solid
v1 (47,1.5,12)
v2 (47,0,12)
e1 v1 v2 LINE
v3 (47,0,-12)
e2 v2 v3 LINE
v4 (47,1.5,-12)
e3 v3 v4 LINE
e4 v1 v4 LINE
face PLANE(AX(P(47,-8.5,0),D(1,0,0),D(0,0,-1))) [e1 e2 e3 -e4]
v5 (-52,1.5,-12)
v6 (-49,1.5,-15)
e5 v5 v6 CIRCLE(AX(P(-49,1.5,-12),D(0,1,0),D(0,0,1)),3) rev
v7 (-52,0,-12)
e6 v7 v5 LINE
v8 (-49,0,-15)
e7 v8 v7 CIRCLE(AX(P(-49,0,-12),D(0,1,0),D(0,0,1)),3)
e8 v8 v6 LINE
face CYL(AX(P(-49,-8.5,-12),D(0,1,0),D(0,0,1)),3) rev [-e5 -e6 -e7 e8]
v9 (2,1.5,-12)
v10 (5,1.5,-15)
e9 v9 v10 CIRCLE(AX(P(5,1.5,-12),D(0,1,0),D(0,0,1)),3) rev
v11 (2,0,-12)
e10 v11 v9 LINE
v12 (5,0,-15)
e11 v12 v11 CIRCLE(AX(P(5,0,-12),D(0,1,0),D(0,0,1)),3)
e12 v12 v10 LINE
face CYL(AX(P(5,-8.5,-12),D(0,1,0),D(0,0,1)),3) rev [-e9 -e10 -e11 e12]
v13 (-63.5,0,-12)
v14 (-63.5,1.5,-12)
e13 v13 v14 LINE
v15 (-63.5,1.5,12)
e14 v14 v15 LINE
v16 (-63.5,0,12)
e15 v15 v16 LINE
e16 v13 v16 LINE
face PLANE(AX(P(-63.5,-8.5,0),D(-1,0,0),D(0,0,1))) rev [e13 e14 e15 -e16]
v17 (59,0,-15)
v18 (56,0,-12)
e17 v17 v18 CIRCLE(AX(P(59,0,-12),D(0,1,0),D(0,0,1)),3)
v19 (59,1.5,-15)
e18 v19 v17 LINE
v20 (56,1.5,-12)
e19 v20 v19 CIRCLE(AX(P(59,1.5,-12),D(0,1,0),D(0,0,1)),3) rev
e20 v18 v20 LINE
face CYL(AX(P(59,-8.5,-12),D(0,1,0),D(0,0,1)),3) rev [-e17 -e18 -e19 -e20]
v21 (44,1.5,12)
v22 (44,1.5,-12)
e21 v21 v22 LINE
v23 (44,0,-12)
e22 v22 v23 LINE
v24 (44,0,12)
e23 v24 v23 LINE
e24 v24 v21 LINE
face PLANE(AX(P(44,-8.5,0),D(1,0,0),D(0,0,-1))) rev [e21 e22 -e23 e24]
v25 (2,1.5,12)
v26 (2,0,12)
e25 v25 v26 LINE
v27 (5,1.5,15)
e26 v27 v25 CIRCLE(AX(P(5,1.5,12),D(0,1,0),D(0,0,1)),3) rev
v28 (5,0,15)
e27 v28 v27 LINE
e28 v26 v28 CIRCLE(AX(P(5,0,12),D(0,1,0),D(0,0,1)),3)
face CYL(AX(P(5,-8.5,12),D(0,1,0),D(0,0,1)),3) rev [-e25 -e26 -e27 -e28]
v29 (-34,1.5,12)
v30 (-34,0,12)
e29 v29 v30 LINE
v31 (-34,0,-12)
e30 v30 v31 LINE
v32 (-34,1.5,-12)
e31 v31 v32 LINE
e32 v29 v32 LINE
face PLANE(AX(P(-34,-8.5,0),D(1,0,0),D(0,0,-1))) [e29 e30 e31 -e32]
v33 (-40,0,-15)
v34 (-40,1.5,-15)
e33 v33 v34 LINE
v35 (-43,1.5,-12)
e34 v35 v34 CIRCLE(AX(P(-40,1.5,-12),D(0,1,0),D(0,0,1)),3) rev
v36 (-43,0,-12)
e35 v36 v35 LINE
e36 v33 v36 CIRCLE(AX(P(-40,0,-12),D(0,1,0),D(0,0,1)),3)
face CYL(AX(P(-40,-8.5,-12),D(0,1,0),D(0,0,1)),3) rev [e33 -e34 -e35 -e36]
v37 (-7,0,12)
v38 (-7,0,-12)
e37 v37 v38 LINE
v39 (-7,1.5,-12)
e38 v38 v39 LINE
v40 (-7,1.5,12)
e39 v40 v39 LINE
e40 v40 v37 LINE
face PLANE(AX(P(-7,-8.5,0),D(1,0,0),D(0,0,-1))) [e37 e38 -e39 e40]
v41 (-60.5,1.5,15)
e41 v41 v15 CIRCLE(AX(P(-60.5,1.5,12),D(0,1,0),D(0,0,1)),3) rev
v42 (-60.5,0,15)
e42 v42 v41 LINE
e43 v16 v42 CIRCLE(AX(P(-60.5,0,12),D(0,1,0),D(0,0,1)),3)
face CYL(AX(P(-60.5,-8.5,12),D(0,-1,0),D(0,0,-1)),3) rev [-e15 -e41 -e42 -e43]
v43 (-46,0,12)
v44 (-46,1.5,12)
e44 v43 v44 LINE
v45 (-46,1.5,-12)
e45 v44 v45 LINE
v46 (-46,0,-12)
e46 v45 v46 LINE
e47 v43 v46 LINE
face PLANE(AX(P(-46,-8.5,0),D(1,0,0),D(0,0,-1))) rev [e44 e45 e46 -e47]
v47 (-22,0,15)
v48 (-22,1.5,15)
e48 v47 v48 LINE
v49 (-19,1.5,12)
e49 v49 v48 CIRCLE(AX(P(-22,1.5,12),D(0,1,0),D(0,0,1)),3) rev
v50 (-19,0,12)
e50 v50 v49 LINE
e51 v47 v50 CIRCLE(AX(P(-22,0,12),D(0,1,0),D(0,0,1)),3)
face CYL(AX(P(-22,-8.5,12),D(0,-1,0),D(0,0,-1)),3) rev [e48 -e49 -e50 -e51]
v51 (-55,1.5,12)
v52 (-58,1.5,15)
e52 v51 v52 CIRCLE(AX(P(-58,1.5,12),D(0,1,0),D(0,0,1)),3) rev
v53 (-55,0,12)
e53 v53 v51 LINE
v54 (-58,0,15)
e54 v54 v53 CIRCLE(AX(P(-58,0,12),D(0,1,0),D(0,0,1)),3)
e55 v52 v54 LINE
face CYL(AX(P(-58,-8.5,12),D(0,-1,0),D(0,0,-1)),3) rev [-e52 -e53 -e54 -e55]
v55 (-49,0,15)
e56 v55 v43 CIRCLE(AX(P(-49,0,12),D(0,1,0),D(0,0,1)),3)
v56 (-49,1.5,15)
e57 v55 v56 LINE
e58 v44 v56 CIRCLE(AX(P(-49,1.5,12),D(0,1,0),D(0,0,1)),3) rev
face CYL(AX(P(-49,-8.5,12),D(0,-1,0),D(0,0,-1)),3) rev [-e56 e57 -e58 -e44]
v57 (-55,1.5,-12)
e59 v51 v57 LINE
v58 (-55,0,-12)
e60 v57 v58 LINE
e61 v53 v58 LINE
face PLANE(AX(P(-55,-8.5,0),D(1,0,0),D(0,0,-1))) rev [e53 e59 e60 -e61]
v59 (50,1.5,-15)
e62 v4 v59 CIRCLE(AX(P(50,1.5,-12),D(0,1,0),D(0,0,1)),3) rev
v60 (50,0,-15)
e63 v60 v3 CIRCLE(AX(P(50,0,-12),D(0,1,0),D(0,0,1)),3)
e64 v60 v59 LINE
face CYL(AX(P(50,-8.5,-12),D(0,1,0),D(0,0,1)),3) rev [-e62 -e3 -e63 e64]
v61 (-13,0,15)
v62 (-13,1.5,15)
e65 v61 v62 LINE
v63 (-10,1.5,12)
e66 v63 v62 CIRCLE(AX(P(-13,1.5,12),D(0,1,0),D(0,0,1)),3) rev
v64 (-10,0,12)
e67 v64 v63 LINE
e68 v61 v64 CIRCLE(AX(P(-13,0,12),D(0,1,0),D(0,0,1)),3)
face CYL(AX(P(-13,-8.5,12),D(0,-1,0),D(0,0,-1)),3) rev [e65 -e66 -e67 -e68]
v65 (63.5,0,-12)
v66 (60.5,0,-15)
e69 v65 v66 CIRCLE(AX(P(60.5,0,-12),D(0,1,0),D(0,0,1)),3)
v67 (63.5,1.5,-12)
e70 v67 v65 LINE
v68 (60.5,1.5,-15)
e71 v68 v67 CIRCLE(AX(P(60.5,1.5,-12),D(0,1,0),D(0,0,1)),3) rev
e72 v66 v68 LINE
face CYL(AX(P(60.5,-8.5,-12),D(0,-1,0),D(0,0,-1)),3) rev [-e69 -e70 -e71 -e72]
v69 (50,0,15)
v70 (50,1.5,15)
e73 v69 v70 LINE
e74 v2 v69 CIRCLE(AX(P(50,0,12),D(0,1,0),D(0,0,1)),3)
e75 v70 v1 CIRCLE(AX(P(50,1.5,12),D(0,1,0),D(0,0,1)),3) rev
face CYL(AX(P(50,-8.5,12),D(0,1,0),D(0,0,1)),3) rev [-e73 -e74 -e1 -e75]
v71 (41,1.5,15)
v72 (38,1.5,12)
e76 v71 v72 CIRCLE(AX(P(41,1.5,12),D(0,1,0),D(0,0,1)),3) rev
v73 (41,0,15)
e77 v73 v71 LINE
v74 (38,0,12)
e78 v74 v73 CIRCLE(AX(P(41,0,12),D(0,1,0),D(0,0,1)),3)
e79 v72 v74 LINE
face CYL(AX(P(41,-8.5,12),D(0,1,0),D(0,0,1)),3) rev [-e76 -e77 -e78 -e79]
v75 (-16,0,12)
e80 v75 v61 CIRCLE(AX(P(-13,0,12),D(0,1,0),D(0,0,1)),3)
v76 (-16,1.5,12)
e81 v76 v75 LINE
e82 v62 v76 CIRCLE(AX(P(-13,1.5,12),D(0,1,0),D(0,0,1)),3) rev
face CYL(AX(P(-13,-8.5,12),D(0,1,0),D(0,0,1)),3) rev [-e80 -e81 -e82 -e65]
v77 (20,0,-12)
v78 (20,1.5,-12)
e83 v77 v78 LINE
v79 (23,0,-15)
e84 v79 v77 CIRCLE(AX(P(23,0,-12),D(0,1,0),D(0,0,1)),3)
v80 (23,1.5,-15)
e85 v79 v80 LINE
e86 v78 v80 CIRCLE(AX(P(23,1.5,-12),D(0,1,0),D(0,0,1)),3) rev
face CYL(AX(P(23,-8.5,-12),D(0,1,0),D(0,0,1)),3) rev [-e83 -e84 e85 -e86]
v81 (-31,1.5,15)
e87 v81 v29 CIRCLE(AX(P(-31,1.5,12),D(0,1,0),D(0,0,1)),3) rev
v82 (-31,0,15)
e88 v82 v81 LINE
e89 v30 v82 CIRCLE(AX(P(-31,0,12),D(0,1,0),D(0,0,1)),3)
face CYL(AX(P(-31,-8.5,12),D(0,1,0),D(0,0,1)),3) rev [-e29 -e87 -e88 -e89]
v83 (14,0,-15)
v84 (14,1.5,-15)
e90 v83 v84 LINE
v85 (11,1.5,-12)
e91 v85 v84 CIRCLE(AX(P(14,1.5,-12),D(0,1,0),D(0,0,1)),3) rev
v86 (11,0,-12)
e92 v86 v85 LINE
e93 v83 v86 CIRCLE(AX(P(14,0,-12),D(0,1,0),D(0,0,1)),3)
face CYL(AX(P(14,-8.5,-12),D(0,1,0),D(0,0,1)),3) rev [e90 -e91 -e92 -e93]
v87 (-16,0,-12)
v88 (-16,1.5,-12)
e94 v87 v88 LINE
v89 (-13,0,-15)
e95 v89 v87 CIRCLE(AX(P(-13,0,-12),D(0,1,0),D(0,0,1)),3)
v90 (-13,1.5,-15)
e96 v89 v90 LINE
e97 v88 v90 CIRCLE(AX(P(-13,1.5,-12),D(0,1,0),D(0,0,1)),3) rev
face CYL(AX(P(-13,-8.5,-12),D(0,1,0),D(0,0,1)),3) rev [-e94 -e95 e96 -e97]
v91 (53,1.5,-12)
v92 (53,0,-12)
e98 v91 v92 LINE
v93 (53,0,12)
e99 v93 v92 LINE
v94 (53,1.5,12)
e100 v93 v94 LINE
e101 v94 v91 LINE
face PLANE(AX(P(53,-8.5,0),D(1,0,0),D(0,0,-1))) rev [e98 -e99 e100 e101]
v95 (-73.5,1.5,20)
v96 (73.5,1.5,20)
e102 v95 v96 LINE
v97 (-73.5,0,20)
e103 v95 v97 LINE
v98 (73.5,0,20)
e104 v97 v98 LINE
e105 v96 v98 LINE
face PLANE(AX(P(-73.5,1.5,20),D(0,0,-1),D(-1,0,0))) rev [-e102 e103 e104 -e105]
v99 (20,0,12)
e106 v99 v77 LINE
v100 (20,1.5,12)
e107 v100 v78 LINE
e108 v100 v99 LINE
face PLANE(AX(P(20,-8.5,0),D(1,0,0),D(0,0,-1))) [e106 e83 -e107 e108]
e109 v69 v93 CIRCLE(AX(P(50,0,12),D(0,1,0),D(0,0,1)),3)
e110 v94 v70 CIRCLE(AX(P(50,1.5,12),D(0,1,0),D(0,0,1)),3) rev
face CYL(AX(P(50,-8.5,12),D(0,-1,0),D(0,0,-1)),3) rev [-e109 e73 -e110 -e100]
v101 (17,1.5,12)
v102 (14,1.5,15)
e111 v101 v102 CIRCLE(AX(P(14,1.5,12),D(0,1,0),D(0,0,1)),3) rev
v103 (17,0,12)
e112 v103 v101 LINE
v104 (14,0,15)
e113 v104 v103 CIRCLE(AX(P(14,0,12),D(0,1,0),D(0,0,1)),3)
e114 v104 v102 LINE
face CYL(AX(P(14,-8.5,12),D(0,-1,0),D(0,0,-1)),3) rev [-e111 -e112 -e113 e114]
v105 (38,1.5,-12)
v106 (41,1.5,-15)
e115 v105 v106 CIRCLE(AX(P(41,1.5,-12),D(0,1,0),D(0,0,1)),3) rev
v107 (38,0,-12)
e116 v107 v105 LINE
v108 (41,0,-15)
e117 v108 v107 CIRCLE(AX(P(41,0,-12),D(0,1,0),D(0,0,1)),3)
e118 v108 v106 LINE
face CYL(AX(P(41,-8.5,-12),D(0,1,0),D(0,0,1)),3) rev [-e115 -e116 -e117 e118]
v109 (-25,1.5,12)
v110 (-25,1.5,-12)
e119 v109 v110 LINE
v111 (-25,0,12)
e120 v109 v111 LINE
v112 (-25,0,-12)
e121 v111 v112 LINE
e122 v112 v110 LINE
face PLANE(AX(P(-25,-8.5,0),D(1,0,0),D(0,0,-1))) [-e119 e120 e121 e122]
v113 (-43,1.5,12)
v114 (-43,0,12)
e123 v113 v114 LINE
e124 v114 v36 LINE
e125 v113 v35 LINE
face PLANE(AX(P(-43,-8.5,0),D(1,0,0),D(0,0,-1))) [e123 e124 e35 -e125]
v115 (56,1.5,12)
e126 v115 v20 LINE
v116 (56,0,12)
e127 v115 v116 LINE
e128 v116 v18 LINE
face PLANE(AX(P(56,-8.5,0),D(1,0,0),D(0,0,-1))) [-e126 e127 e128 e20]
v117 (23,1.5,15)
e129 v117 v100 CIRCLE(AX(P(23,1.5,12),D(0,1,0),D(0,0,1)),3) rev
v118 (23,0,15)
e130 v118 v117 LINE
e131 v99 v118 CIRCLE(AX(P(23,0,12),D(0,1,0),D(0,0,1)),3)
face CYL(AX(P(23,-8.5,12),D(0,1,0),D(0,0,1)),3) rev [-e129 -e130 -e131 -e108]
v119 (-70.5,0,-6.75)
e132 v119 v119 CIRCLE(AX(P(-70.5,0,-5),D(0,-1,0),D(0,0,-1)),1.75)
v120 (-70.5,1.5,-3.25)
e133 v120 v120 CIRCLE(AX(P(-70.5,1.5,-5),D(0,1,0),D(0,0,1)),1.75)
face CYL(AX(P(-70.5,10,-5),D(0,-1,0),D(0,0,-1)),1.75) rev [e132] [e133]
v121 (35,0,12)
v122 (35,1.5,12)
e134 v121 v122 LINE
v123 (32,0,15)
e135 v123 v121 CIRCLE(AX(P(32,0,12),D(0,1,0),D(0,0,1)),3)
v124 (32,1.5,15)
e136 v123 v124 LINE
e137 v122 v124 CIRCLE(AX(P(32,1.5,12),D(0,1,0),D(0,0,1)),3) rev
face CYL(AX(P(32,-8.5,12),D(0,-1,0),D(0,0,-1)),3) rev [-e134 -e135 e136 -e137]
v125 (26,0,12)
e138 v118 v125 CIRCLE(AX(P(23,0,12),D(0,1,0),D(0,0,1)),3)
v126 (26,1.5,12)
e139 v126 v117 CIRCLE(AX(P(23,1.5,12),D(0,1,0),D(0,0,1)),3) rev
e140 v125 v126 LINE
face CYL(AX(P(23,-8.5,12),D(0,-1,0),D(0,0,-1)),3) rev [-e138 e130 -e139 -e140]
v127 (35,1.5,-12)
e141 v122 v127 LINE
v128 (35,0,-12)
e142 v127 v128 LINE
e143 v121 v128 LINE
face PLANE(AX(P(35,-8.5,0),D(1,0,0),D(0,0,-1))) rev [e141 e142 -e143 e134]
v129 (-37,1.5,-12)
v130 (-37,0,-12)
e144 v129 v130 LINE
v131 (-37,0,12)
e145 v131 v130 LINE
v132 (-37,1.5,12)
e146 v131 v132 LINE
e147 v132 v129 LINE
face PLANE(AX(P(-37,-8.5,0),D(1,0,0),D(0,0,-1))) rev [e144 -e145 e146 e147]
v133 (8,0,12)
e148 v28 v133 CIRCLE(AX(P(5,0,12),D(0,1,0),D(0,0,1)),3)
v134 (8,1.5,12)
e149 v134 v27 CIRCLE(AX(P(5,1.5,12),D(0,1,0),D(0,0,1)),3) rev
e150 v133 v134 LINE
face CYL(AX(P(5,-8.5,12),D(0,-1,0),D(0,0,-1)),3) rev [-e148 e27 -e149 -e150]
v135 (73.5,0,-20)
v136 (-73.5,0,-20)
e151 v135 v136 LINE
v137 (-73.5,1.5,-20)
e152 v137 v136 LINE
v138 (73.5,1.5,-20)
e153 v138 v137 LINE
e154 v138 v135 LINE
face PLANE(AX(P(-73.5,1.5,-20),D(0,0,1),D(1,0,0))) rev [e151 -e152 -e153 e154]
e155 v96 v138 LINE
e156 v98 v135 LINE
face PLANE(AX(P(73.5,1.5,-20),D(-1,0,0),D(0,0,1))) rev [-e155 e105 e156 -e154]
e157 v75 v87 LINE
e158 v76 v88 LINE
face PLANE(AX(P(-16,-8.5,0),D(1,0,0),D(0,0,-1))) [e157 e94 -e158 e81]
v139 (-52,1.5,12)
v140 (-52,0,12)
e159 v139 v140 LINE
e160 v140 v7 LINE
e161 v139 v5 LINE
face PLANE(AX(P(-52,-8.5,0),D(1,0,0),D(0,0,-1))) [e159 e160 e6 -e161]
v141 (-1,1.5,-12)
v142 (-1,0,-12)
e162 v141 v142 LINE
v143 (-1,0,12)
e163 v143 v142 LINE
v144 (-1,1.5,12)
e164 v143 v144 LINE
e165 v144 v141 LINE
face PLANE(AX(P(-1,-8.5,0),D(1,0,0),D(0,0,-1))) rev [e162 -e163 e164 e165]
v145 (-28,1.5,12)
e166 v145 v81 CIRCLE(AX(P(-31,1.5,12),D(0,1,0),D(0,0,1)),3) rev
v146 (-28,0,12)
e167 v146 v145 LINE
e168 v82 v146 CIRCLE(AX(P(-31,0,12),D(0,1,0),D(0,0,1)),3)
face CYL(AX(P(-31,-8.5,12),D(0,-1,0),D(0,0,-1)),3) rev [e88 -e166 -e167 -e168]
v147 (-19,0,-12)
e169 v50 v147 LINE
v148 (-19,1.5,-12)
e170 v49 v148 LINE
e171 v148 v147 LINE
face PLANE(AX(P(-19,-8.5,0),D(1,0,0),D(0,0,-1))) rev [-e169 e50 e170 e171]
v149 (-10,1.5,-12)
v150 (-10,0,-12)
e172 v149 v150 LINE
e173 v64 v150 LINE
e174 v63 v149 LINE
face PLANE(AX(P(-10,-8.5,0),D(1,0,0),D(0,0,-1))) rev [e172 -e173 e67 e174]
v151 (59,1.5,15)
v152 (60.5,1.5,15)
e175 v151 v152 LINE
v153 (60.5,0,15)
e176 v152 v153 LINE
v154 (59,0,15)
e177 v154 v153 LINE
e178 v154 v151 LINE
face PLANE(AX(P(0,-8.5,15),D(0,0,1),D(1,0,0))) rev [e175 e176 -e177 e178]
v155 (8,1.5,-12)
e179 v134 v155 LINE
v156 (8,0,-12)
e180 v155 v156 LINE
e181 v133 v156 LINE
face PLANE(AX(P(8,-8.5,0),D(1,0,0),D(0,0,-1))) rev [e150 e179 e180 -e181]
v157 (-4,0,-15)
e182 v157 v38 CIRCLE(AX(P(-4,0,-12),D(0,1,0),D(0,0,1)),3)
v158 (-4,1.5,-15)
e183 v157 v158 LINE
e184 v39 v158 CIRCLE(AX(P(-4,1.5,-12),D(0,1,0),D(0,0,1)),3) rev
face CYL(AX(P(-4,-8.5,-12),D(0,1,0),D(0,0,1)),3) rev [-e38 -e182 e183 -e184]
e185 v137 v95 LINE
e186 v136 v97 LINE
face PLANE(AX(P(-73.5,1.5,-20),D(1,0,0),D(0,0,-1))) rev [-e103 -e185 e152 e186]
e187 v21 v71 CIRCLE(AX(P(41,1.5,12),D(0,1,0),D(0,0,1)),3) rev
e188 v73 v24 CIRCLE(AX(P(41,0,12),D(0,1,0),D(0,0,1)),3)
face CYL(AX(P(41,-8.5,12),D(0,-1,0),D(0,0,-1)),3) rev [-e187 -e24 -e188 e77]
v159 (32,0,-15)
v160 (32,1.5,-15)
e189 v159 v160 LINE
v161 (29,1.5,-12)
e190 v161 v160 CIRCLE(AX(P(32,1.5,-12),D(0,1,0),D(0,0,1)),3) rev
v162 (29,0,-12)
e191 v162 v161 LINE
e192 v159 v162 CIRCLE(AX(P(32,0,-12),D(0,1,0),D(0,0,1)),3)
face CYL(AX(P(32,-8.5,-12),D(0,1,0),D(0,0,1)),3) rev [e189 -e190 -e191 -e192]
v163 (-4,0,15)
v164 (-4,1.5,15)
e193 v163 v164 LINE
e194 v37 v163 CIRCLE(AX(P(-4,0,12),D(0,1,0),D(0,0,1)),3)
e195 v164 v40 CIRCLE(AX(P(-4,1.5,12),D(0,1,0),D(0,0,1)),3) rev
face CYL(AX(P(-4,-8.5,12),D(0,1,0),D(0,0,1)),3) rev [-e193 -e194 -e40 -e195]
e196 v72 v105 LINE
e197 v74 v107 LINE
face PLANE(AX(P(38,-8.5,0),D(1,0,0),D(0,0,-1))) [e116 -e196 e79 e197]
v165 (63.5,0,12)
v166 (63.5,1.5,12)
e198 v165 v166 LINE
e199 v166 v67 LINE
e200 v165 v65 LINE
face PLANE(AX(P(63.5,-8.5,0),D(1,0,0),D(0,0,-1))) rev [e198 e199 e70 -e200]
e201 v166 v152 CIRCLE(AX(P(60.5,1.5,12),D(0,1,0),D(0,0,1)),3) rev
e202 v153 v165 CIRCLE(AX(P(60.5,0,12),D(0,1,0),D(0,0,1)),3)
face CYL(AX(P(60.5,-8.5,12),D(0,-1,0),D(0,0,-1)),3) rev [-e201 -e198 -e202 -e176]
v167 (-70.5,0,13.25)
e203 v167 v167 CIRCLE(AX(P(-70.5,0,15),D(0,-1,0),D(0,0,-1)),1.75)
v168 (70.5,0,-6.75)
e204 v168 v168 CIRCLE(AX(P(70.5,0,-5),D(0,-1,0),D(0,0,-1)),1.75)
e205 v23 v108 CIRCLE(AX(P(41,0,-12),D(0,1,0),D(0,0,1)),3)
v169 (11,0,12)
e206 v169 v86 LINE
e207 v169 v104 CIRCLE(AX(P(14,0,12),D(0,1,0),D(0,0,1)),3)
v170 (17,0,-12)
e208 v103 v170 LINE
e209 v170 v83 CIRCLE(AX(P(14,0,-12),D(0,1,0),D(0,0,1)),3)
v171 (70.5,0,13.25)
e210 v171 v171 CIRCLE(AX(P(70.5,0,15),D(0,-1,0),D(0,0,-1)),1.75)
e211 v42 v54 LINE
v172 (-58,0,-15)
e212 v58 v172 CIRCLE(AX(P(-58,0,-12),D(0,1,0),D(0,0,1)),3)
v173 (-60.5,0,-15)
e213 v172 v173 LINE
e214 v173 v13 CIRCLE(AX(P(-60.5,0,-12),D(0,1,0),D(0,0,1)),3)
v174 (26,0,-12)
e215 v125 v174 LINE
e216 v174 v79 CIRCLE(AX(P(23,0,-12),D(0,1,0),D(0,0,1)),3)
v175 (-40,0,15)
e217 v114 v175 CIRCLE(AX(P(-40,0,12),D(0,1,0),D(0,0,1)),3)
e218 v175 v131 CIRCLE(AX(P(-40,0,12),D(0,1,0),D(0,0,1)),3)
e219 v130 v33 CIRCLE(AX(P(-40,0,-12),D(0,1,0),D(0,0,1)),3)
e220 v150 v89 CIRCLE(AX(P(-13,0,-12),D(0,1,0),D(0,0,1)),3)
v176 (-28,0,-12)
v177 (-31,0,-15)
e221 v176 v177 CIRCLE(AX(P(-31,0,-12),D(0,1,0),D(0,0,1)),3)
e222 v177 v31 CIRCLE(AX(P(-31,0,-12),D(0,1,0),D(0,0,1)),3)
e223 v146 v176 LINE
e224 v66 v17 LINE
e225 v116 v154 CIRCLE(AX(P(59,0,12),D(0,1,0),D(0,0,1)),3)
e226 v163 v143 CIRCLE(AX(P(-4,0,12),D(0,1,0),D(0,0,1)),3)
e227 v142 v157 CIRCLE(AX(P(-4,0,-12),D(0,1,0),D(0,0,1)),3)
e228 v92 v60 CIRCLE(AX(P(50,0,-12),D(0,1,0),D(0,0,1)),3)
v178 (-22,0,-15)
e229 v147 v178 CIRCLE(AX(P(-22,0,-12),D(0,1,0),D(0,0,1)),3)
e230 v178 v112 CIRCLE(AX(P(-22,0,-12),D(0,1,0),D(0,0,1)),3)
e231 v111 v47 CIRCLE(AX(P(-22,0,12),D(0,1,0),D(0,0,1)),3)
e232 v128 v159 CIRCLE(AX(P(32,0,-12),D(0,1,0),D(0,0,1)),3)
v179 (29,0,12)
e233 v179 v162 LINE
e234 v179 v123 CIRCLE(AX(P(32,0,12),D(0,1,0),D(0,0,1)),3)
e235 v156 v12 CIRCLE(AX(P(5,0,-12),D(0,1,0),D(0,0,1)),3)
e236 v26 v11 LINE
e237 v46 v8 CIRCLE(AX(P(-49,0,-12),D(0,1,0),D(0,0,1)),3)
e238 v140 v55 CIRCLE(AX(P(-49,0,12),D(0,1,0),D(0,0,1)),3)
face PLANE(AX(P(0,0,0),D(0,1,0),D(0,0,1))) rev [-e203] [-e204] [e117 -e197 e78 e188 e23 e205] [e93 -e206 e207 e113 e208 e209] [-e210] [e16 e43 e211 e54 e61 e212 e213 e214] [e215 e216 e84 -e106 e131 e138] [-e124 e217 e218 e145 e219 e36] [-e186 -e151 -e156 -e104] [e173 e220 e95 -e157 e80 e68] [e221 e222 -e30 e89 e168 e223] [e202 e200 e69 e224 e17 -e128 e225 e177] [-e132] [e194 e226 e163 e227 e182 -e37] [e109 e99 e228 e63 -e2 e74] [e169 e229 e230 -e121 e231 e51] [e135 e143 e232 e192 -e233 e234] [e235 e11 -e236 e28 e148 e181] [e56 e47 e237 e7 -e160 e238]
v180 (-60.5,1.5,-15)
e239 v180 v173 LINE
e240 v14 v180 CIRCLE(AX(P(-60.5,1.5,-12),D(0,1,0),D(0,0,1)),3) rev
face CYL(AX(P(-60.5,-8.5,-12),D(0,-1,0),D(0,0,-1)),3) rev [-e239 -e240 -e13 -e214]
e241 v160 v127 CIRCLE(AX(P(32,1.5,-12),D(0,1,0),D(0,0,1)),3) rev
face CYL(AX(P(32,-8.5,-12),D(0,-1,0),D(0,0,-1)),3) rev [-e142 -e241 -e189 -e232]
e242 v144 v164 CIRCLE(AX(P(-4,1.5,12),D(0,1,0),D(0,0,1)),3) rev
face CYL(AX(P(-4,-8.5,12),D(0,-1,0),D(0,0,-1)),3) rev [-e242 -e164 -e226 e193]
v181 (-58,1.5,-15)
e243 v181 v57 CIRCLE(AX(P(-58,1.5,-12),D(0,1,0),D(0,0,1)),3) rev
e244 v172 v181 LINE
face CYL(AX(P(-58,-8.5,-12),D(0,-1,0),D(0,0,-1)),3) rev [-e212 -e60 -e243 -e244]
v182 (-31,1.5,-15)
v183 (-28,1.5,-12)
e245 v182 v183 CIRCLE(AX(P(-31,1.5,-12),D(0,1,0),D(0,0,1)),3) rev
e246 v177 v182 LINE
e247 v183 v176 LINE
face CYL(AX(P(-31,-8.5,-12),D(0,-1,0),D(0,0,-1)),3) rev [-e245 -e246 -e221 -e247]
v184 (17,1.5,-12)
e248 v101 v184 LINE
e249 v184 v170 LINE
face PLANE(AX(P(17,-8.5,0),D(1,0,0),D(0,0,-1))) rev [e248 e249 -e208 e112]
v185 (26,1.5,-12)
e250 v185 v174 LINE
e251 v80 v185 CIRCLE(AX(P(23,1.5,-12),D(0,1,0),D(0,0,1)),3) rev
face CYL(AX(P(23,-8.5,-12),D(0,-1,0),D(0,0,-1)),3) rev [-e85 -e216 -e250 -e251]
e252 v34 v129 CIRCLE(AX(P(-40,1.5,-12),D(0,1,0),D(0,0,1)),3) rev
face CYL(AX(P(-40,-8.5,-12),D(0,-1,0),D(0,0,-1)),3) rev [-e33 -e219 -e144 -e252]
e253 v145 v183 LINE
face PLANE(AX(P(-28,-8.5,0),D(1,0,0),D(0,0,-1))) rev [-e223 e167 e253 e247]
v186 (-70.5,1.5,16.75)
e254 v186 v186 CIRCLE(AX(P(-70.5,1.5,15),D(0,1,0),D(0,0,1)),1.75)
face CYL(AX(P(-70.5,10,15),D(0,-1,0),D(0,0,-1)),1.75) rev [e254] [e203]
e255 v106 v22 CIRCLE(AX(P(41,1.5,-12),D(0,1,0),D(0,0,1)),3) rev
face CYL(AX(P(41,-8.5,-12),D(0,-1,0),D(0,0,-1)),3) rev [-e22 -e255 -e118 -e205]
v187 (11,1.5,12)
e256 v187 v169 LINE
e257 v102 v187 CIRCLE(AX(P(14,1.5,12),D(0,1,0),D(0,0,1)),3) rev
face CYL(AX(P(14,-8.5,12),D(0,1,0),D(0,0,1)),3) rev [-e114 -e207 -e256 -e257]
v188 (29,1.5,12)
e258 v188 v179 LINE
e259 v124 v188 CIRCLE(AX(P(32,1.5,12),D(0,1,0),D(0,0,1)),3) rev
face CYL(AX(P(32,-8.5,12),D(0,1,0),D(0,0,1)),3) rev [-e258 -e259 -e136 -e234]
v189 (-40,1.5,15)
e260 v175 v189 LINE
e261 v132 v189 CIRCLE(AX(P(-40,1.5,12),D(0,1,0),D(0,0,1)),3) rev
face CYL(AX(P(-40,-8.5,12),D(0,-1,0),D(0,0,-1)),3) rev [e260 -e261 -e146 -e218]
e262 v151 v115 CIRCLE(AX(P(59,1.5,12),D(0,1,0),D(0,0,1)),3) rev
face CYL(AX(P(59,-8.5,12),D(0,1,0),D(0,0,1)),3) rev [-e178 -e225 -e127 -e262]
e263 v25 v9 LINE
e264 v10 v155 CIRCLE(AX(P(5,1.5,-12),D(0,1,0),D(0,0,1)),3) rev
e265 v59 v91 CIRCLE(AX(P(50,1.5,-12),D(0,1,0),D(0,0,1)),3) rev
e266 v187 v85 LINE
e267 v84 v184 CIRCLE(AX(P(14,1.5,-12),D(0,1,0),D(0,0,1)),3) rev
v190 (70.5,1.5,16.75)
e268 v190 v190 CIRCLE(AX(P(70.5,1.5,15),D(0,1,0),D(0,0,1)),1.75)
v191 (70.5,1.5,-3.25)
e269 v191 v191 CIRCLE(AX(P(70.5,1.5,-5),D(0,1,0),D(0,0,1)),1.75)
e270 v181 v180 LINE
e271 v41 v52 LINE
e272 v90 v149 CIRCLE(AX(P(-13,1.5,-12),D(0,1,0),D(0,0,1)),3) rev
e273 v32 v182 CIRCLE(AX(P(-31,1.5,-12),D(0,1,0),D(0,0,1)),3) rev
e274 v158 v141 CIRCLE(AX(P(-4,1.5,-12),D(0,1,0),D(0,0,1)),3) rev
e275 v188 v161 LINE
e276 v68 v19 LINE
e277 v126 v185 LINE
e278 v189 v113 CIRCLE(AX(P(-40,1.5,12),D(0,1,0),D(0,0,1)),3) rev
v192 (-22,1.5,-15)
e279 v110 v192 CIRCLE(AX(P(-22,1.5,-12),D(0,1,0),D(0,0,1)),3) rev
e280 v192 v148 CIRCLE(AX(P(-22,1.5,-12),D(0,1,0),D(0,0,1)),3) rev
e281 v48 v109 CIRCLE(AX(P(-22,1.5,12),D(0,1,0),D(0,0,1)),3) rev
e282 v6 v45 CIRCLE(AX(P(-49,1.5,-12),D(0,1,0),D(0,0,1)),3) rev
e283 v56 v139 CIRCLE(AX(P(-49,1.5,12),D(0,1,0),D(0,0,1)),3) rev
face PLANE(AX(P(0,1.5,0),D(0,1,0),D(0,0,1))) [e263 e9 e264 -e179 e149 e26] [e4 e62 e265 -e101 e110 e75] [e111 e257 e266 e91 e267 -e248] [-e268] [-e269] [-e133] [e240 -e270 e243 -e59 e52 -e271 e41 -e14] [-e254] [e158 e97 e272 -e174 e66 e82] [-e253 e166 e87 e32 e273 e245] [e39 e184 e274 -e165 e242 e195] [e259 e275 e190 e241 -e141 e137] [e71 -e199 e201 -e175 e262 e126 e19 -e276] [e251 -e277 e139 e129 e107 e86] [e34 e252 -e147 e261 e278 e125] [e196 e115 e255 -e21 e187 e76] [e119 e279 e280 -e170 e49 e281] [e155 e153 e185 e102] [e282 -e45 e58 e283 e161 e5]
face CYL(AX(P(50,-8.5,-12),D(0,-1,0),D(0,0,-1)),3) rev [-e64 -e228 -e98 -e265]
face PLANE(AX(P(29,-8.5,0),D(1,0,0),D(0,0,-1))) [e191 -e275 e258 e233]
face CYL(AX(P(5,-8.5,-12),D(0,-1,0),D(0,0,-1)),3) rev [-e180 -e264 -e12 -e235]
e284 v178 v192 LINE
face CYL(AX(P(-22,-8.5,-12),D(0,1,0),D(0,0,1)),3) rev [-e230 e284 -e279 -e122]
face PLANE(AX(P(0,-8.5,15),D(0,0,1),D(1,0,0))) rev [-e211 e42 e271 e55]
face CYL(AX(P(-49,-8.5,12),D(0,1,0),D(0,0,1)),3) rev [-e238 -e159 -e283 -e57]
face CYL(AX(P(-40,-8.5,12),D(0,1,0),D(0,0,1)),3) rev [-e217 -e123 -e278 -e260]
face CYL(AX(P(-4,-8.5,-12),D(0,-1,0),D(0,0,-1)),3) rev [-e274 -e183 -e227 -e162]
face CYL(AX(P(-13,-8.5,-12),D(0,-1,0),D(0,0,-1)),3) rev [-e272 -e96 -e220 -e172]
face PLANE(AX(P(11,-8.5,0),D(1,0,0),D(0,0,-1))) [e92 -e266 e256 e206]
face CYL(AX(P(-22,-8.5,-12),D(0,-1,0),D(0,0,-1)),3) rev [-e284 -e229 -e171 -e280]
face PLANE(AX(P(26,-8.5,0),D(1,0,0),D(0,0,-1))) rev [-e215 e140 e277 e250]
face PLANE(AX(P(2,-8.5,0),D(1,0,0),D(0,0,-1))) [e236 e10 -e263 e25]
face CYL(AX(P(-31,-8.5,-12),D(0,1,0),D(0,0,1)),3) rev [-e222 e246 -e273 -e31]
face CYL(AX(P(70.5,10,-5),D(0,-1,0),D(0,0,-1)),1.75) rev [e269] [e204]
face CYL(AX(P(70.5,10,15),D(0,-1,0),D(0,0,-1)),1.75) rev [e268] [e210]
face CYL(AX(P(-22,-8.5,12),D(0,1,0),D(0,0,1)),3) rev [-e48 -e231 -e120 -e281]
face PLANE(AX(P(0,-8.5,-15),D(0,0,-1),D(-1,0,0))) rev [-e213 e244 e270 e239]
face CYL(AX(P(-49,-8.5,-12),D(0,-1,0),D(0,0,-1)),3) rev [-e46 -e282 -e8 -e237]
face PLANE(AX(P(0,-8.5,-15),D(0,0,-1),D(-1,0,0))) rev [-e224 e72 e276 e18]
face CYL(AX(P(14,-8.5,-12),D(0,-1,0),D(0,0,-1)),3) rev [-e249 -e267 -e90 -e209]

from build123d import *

# Parameters (mm, degrees)
SKETCH_2_W          = 147
SKETCH_2_H          = 40
EXTRUDE_1_DEPTH     = 1.5
SKETCH_3_R          = 1.75
CUT_EXTRUDE_1_DEPTH = 10
SKETCH_4_W          = 8.5
SKETCH_4_H          = 30
SKETCH_4_W_2        = 6
SKETCH_4_W_3        = 7.5
CUT_EXTRUDE_2_DEPTH = 10
FILLET_1_R          = 3


with BuildPart() as part:
    # 草图2 → 凸台-拉伸1 (new body)
    with BuildSketch(Plane(origin=(0, 0, 0), x_dir=(1, 0, 0), z_dir=(0, 1, 0))):
        Rectangle(SKETCH_2_W, SKETCH_2_H)
    extrude(amount=EXTRUDE_1_DEPTH)

    # 草图3 → 切除-拉伸1 (cut)
    with BuildSketch(Plane.XZ):
        with Locations(Location((70.5, 15, 0), (0, 0, 270))):
            Circle(SKETCH_3_R)
        with Locations(Location((70.5, -5, 0), (0, 0, 270))):
            Circle(SKETCH_3_R)
        with Locations(Location((-70.5, 15, 0), (0, 0, 270))):
            Circle(SKETCH_3_R)
        with Locations(Location((-70.5, -5, 0), (0, 0, 270))):
            Circle(SKETCH_3_R)
    extrude(amount=-CUT_EXTRUDE_1_DEPTH, mode=Mode.SUBTRACT)

    # 草图4 → 切除-拉伸2 (cut)
    with BuildSketch(Plane(origin=(0, 1.5, 0), x_dir=(1, 0, 0), z_dir=(0, 1, 0))):
        with Locations((-59.25, 0)):
            Rectangle(SKETCH_4_W, SKETCH_4_H)
        with Locations((-49, 0)):
            Rectangle(SKETCH_4_W_2, SKETCH_4_H)
        with Locations((-40, 0)):
            Rectangle(SKETCH_4_W_2, SKETCH_4_H)
        with Locations((-31, 0)):
            Rectangle(SKETCH_4_W_2, SKETCH_4_H)
        with Locations((-22, 0)):
            Rectangle(SKETCH_4_W_2, SKETCH_4_H)
        with Locations((-13, 0)):
            Rectangle(SKETCH_4_W_2, SKETCH_4_H)
        with Locations((-4, 0)):
            Rectangle(SKETCH_4_W_2, SKETCH_4_H)
        with Locations((5, 0)):
            Rectangle(SKETCH_4_W_2, SKETCH_4_H)
        with Locations((14, 0)):
            Rectangle(SKETCH_4_W_2, SKETCH_4_H)
        with Locations((23, 0)):
            Rectangle(SKETCH_4_W_2, SKETCH_4_H)
        with Locations((32, 0)):
            Rectangle(SKETCH_4_W_2, SKETCH_4_H)
        with Locations((41, 0)):
            Rectangle(SKETCH_4_W_2, SKETCH_4_H)
        with Locations((50, 0)):
            Rectangle(SKETCH_4_W_2, SKETCH_4_H)
        with Locations((59.75, 0)):
            Rectangle(SKETCH_4_W_3, SKETCH_4_H)
    extrude(amount=-CUT_EXTRUDE_2_DEPTH, mode=Mode.SUBTRACT)

    # 圆角1
    fillet_1_edges = [part.edges().sort_by_distance(p)[0] for p in [
        (-52, 0.75, -15),
        (-46, 0.75, -15),
        (-37, 0.75, 15),
        (-43, 0.75, 15),
        (-43, 0.75, -15),
        (-37, 0.75, -15),
        (-28, 0.75, 15),
        (-34, 0.75, 15),
        (-34, 0.75, -15),
        (-28, 0.75, -15),
        (-19, 0.75, 15),
        (-25, 0.75, 15),
        (-25, 0.75, -15),
        (-19, 0.75, -15),
        (-10, 0.75, 15),
        (-16, 0.75, 15),
        (-16, 0.75, -15),
        (-10, 0.75, -15),
        (-1, 0.75, 15),
        (-7, 0.75, 15),
        (-7, 0.75, -15),
        (-1, 0.75, -15),
        (8, 0.75, 15),
        (2, 0.75, 15),
        (2, 0.75, -15),
        (8, 0.75, -15),
        (17, 0.75, 15),
        (11, 0.75, 15),
        (11, 0.75, -15),
        (17, 0.75, -15),
        (26, 0.75, 15),
        (20, 0.75, 15),
        (20, 0.75, -15),
        (26, 0.75, -15),
        (35, 0.75, 15),
        (29, 0.75, 15),
        (29, 0.75, -15),
        (35, 0.75, -15),
        (44, 0.75, 15),
        (38, 0.75, 15),
        (38, 0.75, -15),
        (44, 0.75, -15),
        (53, 0.75, 15),
        (47, 0.75, 15),
        (47, 0.75, -15),
        (53, 0.75, -15),
        (56, 0.75, 15),
        (56, 0.75, -15),
        (63.5, 0.75, -15),
        (63.5, 0.75, 15),
        (-55, 0.75, 15),
        (-63.5, 0.75, 15),
        (-63.5, 0.75, -15),
        (-55, 0.75, -15),
        (-46, 0.75, 15),
        (-52, 0.75, 15),
    ]]
    fillet(fillet_1_edges, radius=FILLET_1_R - 0.0001)  # a hair under: the kernel refuses the full size


solid = part.part
